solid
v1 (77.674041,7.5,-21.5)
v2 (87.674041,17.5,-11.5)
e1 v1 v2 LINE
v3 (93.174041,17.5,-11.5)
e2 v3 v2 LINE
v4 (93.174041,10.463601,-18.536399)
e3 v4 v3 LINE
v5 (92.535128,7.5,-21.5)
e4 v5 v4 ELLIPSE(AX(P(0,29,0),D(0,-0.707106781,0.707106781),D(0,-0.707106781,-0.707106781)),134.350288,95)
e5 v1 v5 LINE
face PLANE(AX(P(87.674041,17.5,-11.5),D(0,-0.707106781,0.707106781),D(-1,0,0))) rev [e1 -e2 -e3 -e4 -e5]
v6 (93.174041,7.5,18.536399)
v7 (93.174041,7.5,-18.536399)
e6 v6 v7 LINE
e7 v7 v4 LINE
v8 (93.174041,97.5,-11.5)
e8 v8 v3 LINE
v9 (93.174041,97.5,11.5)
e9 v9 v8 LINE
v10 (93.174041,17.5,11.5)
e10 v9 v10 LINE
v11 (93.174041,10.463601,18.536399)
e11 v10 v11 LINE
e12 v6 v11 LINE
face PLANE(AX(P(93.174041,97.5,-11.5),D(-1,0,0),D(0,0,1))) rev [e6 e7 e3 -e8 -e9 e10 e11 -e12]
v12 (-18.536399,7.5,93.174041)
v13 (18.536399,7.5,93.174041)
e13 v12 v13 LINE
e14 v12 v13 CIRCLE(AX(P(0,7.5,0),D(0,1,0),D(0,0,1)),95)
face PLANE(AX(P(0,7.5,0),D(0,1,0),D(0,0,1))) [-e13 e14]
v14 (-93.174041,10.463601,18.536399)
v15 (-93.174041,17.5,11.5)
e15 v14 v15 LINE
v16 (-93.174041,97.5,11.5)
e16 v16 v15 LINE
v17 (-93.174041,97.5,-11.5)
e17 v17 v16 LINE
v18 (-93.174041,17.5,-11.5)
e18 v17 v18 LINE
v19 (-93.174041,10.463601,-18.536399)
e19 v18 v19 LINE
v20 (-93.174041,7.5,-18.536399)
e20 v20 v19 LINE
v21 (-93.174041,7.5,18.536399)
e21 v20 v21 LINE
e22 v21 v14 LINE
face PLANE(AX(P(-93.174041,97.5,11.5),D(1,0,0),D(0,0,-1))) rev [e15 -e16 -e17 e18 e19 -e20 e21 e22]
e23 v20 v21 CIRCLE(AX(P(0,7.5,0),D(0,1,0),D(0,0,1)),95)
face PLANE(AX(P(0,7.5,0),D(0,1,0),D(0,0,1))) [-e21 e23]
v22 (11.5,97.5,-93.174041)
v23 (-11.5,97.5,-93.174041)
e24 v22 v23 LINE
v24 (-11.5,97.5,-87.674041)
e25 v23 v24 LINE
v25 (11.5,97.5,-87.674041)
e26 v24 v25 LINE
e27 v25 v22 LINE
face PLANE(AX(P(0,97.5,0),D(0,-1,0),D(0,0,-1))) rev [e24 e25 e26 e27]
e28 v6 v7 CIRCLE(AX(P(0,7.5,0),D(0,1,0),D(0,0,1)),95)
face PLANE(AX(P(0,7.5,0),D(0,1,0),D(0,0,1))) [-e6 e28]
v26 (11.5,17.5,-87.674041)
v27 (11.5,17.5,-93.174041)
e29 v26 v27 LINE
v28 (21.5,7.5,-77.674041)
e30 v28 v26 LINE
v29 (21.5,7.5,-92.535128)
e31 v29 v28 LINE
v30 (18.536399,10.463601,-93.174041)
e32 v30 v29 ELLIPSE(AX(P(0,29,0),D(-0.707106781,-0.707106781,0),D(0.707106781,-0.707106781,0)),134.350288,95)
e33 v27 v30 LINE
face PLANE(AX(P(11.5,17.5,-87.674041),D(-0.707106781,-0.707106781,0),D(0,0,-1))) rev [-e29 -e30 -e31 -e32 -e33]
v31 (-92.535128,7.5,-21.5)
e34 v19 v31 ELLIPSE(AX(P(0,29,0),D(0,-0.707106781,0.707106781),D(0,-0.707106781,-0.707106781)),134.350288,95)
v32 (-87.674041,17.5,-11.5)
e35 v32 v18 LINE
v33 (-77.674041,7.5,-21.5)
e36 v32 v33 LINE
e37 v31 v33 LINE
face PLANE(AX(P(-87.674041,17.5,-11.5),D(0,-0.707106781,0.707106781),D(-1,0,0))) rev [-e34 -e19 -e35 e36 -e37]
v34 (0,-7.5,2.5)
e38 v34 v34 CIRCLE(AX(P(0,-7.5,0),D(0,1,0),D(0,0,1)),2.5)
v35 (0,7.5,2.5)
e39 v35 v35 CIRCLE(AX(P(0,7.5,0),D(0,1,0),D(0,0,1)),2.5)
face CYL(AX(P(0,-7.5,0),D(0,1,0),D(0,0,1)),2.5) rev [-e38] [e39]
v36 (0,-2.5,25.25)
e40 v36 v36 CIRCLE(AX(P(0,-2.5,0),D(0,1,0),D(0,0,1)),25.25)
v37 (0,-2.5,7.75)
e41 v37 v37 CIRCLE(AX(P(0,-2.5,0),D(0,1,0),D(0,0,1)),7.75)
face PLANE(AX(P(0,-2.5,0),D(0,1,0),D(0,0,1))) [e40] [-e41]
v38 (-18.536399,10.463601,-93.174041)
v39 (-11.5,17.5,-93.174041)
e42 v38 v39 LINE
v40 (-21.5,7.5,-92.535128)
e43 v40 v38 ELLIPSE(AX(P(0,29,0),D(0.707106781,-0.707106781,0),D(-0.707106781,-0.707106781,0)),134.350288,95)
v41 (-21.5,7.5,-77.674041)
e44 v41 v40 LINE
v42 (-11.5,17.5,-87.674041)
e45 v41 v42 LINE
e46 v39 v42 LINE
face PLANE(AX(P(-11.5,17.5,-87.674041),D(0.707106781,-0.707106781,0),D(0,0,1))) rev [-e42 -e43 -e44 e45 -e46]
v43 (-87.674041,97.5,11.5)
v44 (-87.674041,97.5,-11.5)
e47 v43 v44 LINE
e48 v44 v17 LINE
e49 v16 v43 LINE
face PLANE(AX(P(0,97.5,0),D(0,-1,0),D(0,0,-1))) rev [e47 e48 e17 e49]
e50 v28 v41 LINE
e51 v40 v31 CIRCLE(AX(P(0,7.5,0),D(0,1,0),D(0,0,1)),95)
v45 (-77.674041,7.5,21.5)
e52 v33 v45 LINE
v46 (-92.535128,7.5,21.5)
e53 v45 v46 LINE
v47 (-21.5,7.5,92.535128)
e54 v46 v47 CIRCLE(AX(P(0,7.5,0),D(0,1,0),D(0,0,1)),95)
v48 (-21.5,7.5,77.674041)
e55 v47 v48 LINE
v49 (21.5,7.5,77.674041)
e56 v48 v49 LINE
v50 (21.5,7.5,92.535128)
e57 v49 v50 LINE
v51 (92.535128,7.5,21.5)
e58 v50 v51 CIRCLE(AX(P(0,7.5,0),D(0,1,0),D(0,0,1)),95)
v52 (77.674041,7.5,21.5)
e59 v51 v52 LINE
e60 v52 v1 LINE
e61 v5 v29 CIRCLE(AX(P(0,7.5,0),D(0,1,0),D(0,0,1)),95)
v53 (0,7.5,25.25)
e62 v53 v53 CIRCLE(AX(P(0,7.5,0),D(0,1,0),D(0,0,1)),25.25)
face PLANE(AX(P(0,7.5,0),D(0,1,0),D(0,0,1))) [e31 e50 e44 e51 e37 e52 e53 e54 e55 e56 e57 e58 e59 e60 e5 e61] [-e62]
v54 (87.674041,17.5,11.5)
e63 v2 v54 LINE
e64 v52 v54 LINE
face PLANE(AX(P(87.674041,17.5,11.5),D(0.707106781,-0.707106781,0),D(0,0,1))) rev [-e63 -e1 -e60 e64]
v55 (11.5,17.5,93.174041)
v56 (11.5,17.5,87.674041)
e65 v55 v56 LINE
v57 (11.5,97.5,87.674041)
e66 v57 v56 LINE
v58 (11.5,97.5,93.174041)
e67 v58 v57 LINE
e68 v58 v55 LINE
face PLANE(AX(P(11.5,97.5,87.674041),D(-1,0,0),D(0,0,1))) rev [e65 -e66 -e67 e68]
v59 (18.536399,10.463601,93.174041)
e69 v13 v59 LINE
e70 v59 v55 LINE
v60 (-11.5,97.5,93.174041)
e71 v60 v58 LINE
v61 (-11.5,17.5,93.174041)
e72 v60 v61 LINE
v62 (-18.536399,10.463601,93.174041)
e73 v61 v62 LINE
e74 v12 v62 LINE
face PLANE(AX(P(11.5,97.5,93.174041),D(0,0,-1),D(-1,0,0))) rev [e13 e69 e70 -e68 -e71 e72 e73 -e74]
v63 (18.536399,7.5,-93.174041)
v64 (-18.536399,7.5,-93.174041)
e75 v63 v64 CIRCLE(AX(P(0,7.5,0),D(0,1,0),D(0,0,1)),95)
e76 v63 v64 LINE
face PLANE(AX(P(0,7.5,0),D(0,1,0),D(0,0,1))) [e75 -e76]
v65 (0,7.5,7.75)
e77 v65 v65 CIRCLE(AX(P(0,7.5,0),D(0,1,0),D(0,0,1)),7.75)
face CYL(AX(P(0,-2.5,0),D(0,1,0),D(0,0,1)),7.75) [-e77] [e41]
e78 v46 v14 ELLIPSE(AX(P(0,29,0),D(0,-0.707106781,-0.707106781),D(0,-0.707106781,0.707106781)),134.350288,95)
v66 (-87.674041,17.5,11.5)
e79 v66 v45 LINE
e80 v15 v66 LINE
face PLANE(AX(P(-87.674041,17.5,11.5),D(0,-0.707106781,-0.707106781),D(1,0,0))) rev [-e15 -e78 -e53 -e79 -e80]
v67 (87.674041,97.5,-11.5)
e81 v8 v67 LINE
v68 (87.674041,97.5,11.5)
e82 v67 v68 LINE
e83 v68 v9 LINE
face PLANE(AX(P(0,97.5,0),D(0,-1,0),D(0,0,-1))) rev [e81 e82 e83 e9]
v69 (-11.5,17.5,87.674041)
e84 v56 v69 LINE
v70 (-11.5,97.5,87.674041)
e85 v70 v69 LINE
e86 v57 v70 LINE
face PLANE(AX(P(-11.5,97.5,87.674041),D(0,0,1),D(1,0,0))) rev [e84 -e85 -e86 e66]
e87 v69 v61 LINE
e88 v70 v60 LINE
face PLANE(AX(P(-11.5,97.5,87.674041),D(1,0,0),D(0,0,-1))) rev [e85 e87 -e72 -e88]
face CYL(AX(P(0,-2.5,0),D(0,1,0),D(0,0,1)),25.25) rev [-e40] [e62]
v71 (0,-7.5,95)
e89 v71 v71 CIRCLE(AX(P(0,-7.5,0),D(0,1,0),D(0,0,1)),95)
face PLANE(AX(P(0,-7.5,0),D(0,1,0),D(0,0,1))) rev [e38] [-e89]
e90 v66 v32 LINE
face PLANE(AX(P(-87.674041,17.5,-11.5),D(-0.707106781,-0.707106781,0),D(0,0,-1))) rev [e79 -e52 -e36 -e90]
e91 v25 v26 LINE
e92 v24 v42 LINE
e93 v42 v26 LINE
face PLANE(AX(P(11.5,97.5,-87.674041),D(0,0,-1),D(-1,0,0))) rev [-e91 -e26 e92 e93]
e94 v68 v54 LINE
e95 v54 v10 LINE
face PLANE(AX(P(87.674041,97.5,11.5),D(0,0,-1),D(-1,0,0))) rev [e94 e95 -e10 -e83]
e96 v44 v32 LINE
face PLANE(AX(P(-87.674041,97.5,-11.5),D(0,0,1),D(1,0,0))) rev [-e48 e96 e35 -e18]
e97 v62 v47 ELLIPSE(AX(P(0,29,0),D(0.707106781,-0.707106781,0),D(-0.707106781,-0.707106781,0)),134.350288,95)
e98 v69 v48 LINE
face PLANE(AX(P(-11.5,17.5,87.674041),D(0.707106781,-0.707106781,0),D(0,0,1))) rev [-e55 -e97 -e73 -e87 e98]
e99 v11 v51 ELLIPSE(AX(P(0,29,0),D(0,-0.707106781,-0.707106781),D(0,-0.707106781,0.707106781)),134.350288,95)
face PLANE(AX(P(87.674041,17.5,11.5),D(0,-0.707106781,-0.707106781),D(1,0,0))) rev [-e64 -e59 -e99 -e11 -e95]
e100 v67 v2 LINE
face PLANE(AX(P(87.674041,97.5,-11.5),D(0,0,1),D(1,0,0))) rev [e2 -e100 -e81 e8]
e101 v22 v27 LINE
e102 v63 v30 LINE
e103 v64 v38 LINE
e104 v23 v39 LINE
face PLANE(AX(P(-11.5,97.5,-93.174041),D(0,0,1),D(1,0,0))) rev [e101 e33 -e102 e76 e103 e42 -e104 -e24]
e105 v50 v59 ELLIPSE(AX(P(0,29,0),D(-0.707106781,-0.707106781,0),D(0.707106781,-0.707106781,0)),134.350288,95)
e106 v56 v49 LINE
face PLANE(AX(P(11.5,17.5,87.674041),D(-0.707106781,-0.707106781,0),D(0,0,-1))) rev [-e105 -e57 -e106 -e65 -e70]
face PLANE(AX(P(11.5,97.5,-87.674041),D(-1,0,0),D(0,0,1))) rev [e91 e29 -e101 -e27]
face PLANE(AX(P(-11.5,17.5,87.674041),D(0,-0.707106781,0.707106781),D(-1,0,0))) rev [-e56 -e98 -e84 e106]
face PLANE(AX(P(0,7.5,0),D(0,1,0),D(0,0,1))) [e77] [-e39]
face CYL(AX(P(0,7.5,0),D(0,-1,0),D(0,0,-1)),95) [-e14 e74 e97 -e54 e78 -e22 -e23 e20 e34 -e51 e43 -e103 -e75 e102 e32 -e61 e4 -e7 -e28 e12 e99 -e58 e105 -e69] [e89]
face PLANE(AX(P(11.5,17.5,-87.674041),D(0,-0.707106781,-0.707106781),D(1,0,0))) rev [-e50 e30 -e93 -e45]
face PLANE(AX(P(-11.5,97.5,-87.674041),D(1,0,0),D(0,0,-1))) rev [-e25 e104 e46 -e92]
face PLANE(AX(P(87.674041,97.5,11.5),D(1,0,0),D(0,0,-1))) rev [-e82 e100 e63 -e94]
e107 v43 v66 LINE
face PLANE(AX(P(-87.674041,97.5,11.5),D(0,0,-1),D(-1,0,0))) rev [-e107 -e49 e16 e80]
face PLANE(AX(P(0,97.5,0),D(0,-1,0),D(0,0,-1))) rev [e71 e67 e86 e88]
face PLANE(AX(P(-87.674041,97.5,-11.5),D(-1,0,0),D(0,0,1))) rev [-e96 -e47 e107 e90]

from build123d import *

# Parameters (mm, degrees)
BOSS_EXTRUDE1_DEPTH     = 7.5
SKETCH2_W               = 23
SKETCH2_H               = 5.500000000000014
SKETCH2_W_2             = 5.5
SKETCH2_H_2             = 23
BOSS_EXTRUDE2_DEPTH     = 90
SKETCH3_R               = 25.25
SKETCH3_R_2             = 7.75
CUT_EXTRUDE1_DEPTH      = 10
CUT_EXTRUDE2_DEPTH      = 162.70961628796235
CUT_EXTRUDE2_DEPTH_BACK = 162.70961628796235
SKETCH4_R               = 2.5
CHAMFER1_SIZE           = 10


with BuildPart() as part:
    # Sketch1 → Boss-Extrude1 (new, symmetric)
    with BuildSketch(Plane(origin=(0, 0, 0), x_dir=(1, 0, 0), z_dir=(0, 1, 0))):
        with BuildLine():
            ThreePointArc((-9.98613997947909, 94.47368421052632), (-82.27241335952168, 47.49999999999999), (-86.80968050516414, -38.58859119728691))
            ThreePointArc((-86.80968050516414, -38.58859119728691), (-82.27241335952166, -47.500000000000036), (-76.82354052568505, -55.885093013239505))
            ThreePointArc((-76.82354052568505, -55.885093013239505), (4.801e-14, -95.00000000000001), (76.82354052568508, -55.88509301323945))
            ThreePointArc((76.82354052568508, -55.88509301323945), (82.2724133595217, -47.499999999999986), (86.80968050516417, -38.58859119728684))
            ThreePointArc((86.80968050516417, -38.58859119728684), (82.27241335952168, 47.50000000000001), (9.986139979479082, 94.47368421052632))
            ThreePointArc((9.986139979479082, 94.47368421052632), (5.82e-15, 95), (-9.98613997947909, 94.47368421052632))
        make_face()
    extrude(amount=BOSS_EXTRUDE1_DEPTH, both=True)

    # Sketch2 → Boss-Extrude2 (add)
    with BuildSketch(Plane(origin=(0, 7.5, 0), x_dir=(1, 0, 0), z_dir=(0, 1, 0))):
        with Locations((0, 90.42404100918682)):
            Rectangle(SKETCH2_W, SKETCH2_H)
        with Locations((90.42404100918962, 2.14584e-12)):
            Rectangle(SKETCH2_W_2, SKETCH2_H_2)
        Polygon((11.50000000000496, -93.17404100918749), (-11.49999999999504, -93.17404100918749), (-11.499999999995042, -87.67404100918748), (11.500000000004958, -87.67404100918748), align=None)
        Polygon((-93.17404100918469, -11.500000000002824), (-93.17404100918469, 11.499999999997176), (-87.67404100918468, 11.499999999997177), (-87.67404100918468, -11.500000000002823), align=None)
    extrude(amount=BOSS_EXTRUDE2_DEPTH)

    # Sketch3 → Cut-Extrude1 (cut)
    with BuildSketch(Plane(origin=(0, 7.5, 0), x_dir=(1, 0, 0), z_dir=(0, 1, 0))):
        with Locations(Location((0, 0, 0), (0, 0, 270))):
            Circle(SKETCH3_R)
        with Locations(Location((0, 0, 0), (0, 0, 270))):
            Circle(SKETCH3_R_2, mode=Mode.SUBTRACT)
    extrude(amount=-CUT_EXTRUDE1_DEPTH, mode=Mode.SUBTRACT)

    # Sketch4 → Cut-Extrude2 (cut, two sides: drawn at the far end of the back side and taken through both)
    with BuildSketch(Plane(origin=(0, 7.5, 0), x_dir=(1, 0, 0), z_dir=(0, 1, 0)).offset(-CUT_EXTRUDE2_DEPTH_BACK)):
        with Locations(Location((0, 0, 0), (0, 0, 270))):
            Circle(SKETCH4_R)
    extrude(amount=CUT_EXTRUDE2_DEPTH + CUT_EXTRUDE2_DEPTH_BACK, mode=Mode.SUBTRACT)

    # Chamfer1
    # the kernel refuses this chamfer: 10 mm, written as the material it adds along each edge
    with BuildSketch(Plane(origin=(-11.5, 7.5, -87.67404100918681), x_dir=(-0.9996219169112968, -0.027495876610586403, 0), z_dir=(0, 0, -1))) as chamfer1_piece_1_section:
        Polygon((CHAMFER1_SIZE * 0.999621916911, CHAMFER1_SIZE * 0.0274958766106), (-CHAMFER1_SIZE * 0.0274958766106, CHAMFER1_SIZE * 0.999621916911), (0, 0), align=None)
    chamfer1_piece_1 = extrude(amount=5.500000000000014, mode=Mode.PRIVATE)
    chamfer1_piece_1 = chamfer1_piece_1 & Plane(origin=(-7.11e-15, 10.81050074609558, 2.265e-14), x_dir=(-0.10511726294188506, 0, -0.9944598337950139), z_dir=(0, -1, 0)) * Cylinder(95, 51, mode=Mode.PRIVATE)
    add(chamfer1_piece_1)
    with BuildSketch(Plane(origin=(11.5, 7.5, -87.67404100918681), x_dir=(0, -0.027495876610586403, 0.9996219169112968), z_dir=(-1, 0, 0)), Plane(origin=(87.67404100918962, 7.5, 11.499999999997854), x_dir=(-0.9996219169112968, -0.027495876610586403, 0), z_dir=(0, 0, -1)), Plane(origin=(-11.499999999995042, 7.5, 87.67404100918748), x_dir=(0, -0.027495876610586403, -0.9996219169112968), z_dir=(1, 0, 0)), Plane(origin=(-87.67404100918468, 7.5, -11.499999999997177), x_dir=(0.9996219169112968, -0.027495876610586403, 0), z_dir=(0, 0, 1))) as chamfer1_piece_2:
        Polygon((CHAMFER1_SIZE * 0.999621916911, CHAMFER1_SIZE * 0.0274958766106), (-CHAMFER1_SIZE * 0.0274958766106, CHAMFER1_SIZE * 0.999621916911), (0, 0), align=None)
    extrude(amount=23)
    with BuildSketch(Plane(origin=(11.5, 7.5, -93.17404100918682), x_dir=(0.9996219169112968, -0.027495876610586403, 0), z_dir=(0, 0, 1))) as chamfer1_piece_3_section:
        Polygon((CHAMFER1_SIZE * 0.999621916911, CHAMFER1_SIZE * 0.0274958766106), (-CHAMFER1_SIZE * 0.0274958766106, CHAMFER1_SIZE * 0.999621916911), (0, 0), align=None)
    chamfer1_piece_3 = extrude(amount=5.500000000000014, mode=Mode.PRIVATE)
    chamfer1_piece_3 = chamfer1_piece_3 & Plane(origin=(-7.11e-15, 10.810500746107277, 1.066e-14), x_dir=(0.9137861105806754, 0, 0.4061956968135455), z_dir=(0, -1, 0)) * Cylinder(95.00000000000001, 51, mode=Mode.PRIVATE)
    add(chamfer1_piece_3)
    with BuildSketch(Plane(origin=(87.67404100918962, 7.5, -11.500000000002146), x_dir=(0, -0.027495876610586403, -0.9996219169112968), z_dir=(1, 0, 0))) as chamfer1_piece_4_section:
        Polygon((CHAMFER1_SIZE * 0.999621916911, CHAMFER1_SIZE * 0.0274958766106), (-CHAMFER1_SIZE * 0.0274958766106, CHAMFER1_SIZE * 0.999621916911), (0, 0), align=None)
    chamfer1_piece_4 = extrude(amount=5.500000000000014, mode=Mode.PRIVATE)
    chamfer1_piece_4 = chamfer1_piece_4 & Plane(origin=(-7.11e-15, 10.81050074609573, 1.066e-14), x_dir=(0.9137861105806754, 0, 0.4061956968135455), z_dir=(0, -1, 0)) * Cylinder(95.00000000000001, 51, mode=Mode.PRIVATE)
    add(chamfer1_piece_4)
    with BuildSketch(Plane(origin=(93.17404100918964, 7.5, 11.499999999997854), x_dir=(0, -0.027495876610586403, 0.9996219169112968), z_dir=(-1, 0, 0))) as chamfer1_piece_5_section:
        Polygon((CHAMFER1_SIZE * 0.999621916911, CHAMFER1_SIZE * 0.0274958766106), (-CHAMFER1_SIZE * 0.0274958766106, CHAMFER1_SIZE * 0.999621916911), (0, 0), align=None)
    chamfer1_piece_5 = extrude(amount=5.500000000000014, mode=Mode.PRIVATE)
    chamfer1_piece_5 = chamfer1_piece_5 & Plane(origin=(-7.11e-15, 10.81050074610739, 1.066e-14), x_dir=(0.9137861105806754, 0, 0.4061956968135455), z_dir=(0, -1, 0)) * Cylinder(95.00000000000001, 51, mode=Mode.PRIVATE)
    add(chamfer1_piece_5)
    with BuildSketch(Plane(origin=(11.500000000004958, 7.5, 87.67404100918748), x_dir=(0.9996219169112968, -0.0274958766105864, 0), z_dir=(3.2e-16, 0, 1))) as chamfer1_piece_6_section:
        Polygon((CHAMFER1_SIZE * 0.999621916911, CHAMFER1_SIZE * 0.0274958766106), (-CHAMFER1_SIZE * 0.0274958766106, CHAMFER1_SIZE * 0.999621916911), (0, 0), align=None)
    chamfer1_piece_6 = extrude(amount=5.500000000000014, mode=Mode.PRIVATE)
    chamfer1_piece_6 = chamfer1_piece_6 & Plane(origin=(-7.11e-15, 10.810500746095684, 4.263e-14), x_dir=(-0.8086688476387901, 0, 0.5882641369814681), z_dir=(0, -1, 0)) * Cylinder(94.99999999999999, 51, mode=Mode.PRIVATE)
    add(chamfer1_piece_6)
    with BuildSketch(Plane(origin=(-11.49999999999504, 7.5, 93.17404100918749), x_dir=(-0.9996219169112968, -0.027495876610586403, 0), z_dir=(-3.2e-16, 0, -1))) as chamfer1_piece_7_section:
        Polygon((CHAMFER1_SIZE * 0.999621916911, CHAMFER1_SIZE * 0.0274958766106), (-CHAMFER1_SIZE * 0.0274958766106, CHAMFER1_SIZE * 0.999621916911), (0, 0), align=None)
    chamfer1_piece_7 = extrude(amount=5.500000000000014, mode=Mode.PRIVATE)
    chamfer1_piece_7 = chamfer1_piece_7 & Plane(origin=(-7.11e-15, 10.810500746107264, 4.263e-14), x_dir=(-0.8086688476387901, 0, 0.5882641369814681), z_dir=(0, -1, 0)) * Cylinder(94.99999999999999, 51, mode=Mode.PRIVATE)
    add(chamfer1_piece_7)
    with BuildSketch(Plane(origin=(-87.67404100918468, 7.5, 11.500000000002823), x_dir=(0, -0.02749587661058641, 0.9996219169112968), z_dir=(-1, 0, 3.2e-16))) as chamfer1_piece_8_section:
        Polygon((CHAMFER1_SIZE * 0.999621916911, CHAMFER1_SIZE * 0.0274958766106), (-CHAMFER1_SIZE * 0.0274958766106, CHAMFER1_SIZE * 0.999621916911), (0, 0), align=None)
    chamfer1_piece_8 = extrude(amount=5.500000000000014, mode=Mode.PRIVATE)
    chamfer1_piece_8 = chamfer1_piece_8 & Plane(origin=(-7.11e-15, 10.8105007460955, 2.265e-14), x_dir=(-0.10511726294188506, 0, -0.9944598337950139), z_dir=(0, -1, 0)) * Cylinder(95, 51, mode=Mode.PRIVATE)
    add(chamfer1_piece_8)
    with BuildSketch(Plane(origin=(-93.17404100918469, 7.5, -11.499999999997176), x_dir=(0, -0.027495876610586403, -0.9996219169112968), z_dir=(1, 0, -3.2e-16))) as chamfer1_piece_9_section:
        Polygon((CHAMFER1_SIZE * 0.999621916911, CHAMFER1_SIZE * 0.0274958766106), (-CHAMFER1_SIZE * 0.0274958766106, CHAMFER1_SIZE * 0.999621916911), (0, 0), align=None)
    chamfer1_piece_9 = extrude(amount=5.500000000000014, mode=Mode.PRIVATE)
    chamfer1_piece_9 = chamfer1_piece_9 & Plane(origin=(-7.11e-15, 10.810500746107152, 2.265e-14), x_dir=(-0.10511726294188506, 0, -0.9944598337950139), z_dir=(0, -1, 0)) * Cylinder(95, 51, mode=Mode.PRIVATE)
    add(chamfer1_piece_9)
    with BuildSketch(Plane(origin=(-11.5, 7.5, -61.9572111295277), x_dir=(-0.9996219169112968, -0.027495876610586403, 0), z_dir=(0, 0, -1))) as chamfer1_piece_10a_section:
        Polygon((CHAMFER1_SIZE * 0.999621916911, CHAMFER1_SIZE * 0.0274958766106), (-CHAMFER1_SIZE * 0.0274958766106, CHAMFER1_SIZE * 0.999621916911), (0, 0), align=None)
    chamfer1_piece_10a = extrude(amount=31.216829879659123, mode=Mode.PRIVATE)
    chamfer1_piece_10a = split(chamfer1_piece_10a, bisect_by=Plane(origin=(-14.797936268059384, 10.797936268059397, -87.67404100918681), z_dir=(0, 0, 1)), keep=Keep.TOP, mode=Mode.PRIVATE)
    with BuildSketch(Plane(origin=(11.5, 7.5, -87.67404100918681), x_dir=(0, -0.027495876610586403, 0.9996219169112968), z_dir=(-1, 0, 0))) as chamfer1_piece_10b_section:
        Polygon((CHAMFER1_SIZE * 0.999621916911, CHAMFER1_SIZE * 0.0274958766106), (-CHAMFER1_SIZE * 0.0274958766106, CHAMFER1_SIZE * 0.999621916911), (0, 0), align=None)
    chamfer1_piece_10b = extrude(amount=48.7168298796591, mode=Mode.PRIVATE)
    chamfer1_piece_10b = chamfer1_piece_10b & Plane(origin=(-7.11e-15, 10.791626424571733, 1.066e-14), x_dir=(0.9137861105806754, 0, 0.4061956968135455), z_dir=(0, -1, 0)) * Cylinder(95.00000000000001, 138, mode=Mode.PRIVATE)
    chamfer1_piece_10b = split(chamfer1_piece_10b, bisect_by=Plane(origin=(-11.5, 10.791626424571733, -84.36813075127401), z_dir=(-1, 0, 0)), keep=Keep.TOP, mode=Mode.PRIVATE)
    chamfer1_piece_10 = chamfer1_piece_10a & chamfer1_piece_10b
    add(chamfer1_piece_10)
    with BuildSketch(Plane(origin=(37.2168298796591, 7.5, -87.67404100918681), x_dir=(0, -0.027495876610586403, 0.9996219169112968), z_dir=(-1, 0, 0))) as chamfer1_piece_11a_section:
        Polygon((CHAMFER1_SIZE * 0.999621916911, CHAMFER1_SIZE * 0.0274958766106), (-CHAMFER1_SIZE * 0.0274958766106, CHAMFER1_SIZE * 0.999621916911), (0, 0), align=None)
    chamfer1_piece_11a = extrude(amount=48.7168298796591, mode=Mode.PRIVATE)
    chamfer1_piece_11a = chamfer1_piece_11a & Plane(origin=(-7.11e-15, 10.791626424554309, 1.066e-14), x_dir=(0.9137861105806754, 0, 0.4061956968135455), z_dir=(0, -1, 0)) * Cylinder(95.00000000000001, 138, mode=Mode.PRIVATE)
    chamfer1_piece_11a = split(chamfer1_piece_11a, bisect_by=Plane(origin=(11.5, 10.791626424554309, -84.36813075125882), z_dir=(1, 0, 0)), keep=Keep.TOP, mode=Mode.PRIVATE)
    with BuildSketch(Plane(origin=(11.5, 7.5, -93.17404100918682), x_dir=(0.9996219169112968, -0.027495876610586403, 0), z_dir=(0, 0, 1))) as chamfer1_piece_11b_section:
        Polygon((CHAMFER1_SIZE * 0.999621916911, CHAMFER1_SIZE * 0.0274958766106), (-CHAMFER1_SIZE * 0.0274958766106, CHAMFER1_SIZE * 0.999621916911), (0, 0), align=None)
    chamfer1_piece_11b = extrude(amount=31.216829879659123, mode=Mode.PRIVATE)
    chamfer1_piece_11b = split(chamfer1_piece_11b, bisect_by=Plane(origin=(14.797936268059384, 10.797936268059397, -87.67404100918681), z_dir=(0, 0, 1)), keep=Keep.TOP, mode=Mode.PRIVATE)
    chamfer1_piece_11 = chamfer1_piece_11a & chamfer1_piece_11b
    add(chamfer1_piece_11)
    with BuildSketch(Plane(origin=(61.95721112953051, 7.5, -11.500000000002146), x_dir=(0, -0.027495876610586403, -0.9996219169112968), z_dir=(1, 0, 0))) as chamfer1_piece_12a_section:
        Polygon((CHAMFER1_SIZE * 0.999621916911, CHAMFER1_SIZE * 0.0274958766106), (-CHAMFER1_SIZE * 0.0274958766106, CHAMFER1_SIZE * 0.999621916911), (0, 0), align=None)
    chamfer1_piece_12a = extrude(amount=31.216829879659123, mode=Mode.PRIVATE)
    chamfer1_piece_12a = split(chamfer1_piece_12a, bisect_by=Plane(origin=(87.67404100918962, 10.797936268059399, -14.797936268061527), z_dir=(-1, 0, 0)), keep=Keep.TOP, mode=Mode.PRIVATE)
    with BuildSketch(Plane(origin=(87.67404100918962, 7.5, 11.499999999997854), x_dir=(-0.9996219169112968, -0.027495876610586403, 0), z_dir=(0, 0, -1))) as chamfer1_piece_12b_section:
        Polygon((CHAMFER1_SIZE * 0.999621916911, CHAMFER1_SIZE * 0.0274958766106), (-CHAMFER1_SIZE * 0.0274958766106, CHAMFER1_SIZE * 0.999621916911), (0, 0), align=None)
    chamfer1_piece_12b = extrude(amount=48.7168298796591, mode=Mode.PRIVATE)
    chamfer1_piece_12b = chamfer1_piece_12b & Plane(origin=(-7.11e-15, 10.791626424571684, 1.066e-14), x_dir=(0.9137861105806754, 0, 0.4061956968135455), z_dir=(0, -1, 0)) * Cylinder(95.00000000000001, 138, mode=Mode.PRIVATE)
    chamfer1_piece_12b = split(chamfer1_piece_12b, bisect_by=Plane(origin=(84.36813075127668, 10.791626424571684, -11.500000000002146), z_dir=(0, 0, -1)), keep=Keep.TOP, mode=Mode.PRIVATE)
    chamfer1_piece_12 = chamfer1_piece_12a & chamfer1_piece_12b
    add(chamfer1_piece_12)
    with BuildSketch(Plane(origin=(87.67404100918962, 7.5, 37.216829879656956), x_dir=(-0.9996219169112968, -0.027495876610586403, 0), z_dir=(0, 0, -1))) as chamfer1_piece_13a_section:
        Polygon((CHAMFER1_SIZE * 0.999621916911, CHAMFER1_SIZE * 0.0274958766106), (-CHAMFER1_SIZE * 0.0274958766106, CHAMFER1_SIZE * 0.999621916911), (0, 0), align=None)
    chamfer1_piece_13a = extrude(amount=48.7168298796591, mode=Mode.PRIVATE)
    chamfer1_piece_13a = chamfer1_piece_13a & Plane(origin=(-7.11e-15, 10.791626424553938, 1.066e-14), x_dir=(0.9137861105806754, 0, 0.4061956968135455), z_dir=(0, -1, 0)) * Cylinder(95.00000000000001, 138, mode=Mode.PRIVATE)
    chamfer1_piece_13a = split(chamfer1_piece_13a, bisect_by=Plane(origin=(84.36813075126396, 10.791626424553938, 11.499999999997854), z_dir=(0, 0, 1)), keep=Keep.TOP, mode=Mode.PRIVATE)
    with BuildSketch(Plane(origin=(93.17404100918964, 7.5, 11.499999999997854), x_dir=(0, -0.027495876610586403, 0.9996219169112968), z_dir=(-1, 0, 0))) as chamfer1_piece_13b_section:
        Polygon((CHAMFER1_SIZE * 0.999621916911, CHAMFER1_SIZE * 0.0274958766106), (-CHAMFER1_SIZE * 0.0274958766106, CHAMFER1_SIZE * 0.999621916911), (0, 0), align=None)
    chamfer1_piece_13b = extrude(amount=31.216829879659123, mode=Mode.PRIVATE)
    chamfer1_piece_13b = split(chamfer1_piece_13b, bisect_by=Plane(origin=(87.67404100918962, 10.797936268059402, 14.79793626805724), z_dir=(-1, 0, 0)), keep=Keep.TOP, mode=Mode.PRIVATE)
    chamfer1_piece_13 = chamfer1_piece_13a & chamfer1_piece_13b
    add(chamfer1_piece_13)
    with BuildSketch(Plane(origin=(11.500000000004949, 7.5, 61.95721112952837), x_dir=(0.9996219169112968, -0.027495876610586403, 0), z_dir=(3.2e-16, 0, 1))) as chamfer1_piece_14a_section:
        Polygon((CHAMFER1_SIZE * 0.999621916911, CHAMFER1_SIZE * 0.0274958766106), (-CHAMFER1_SIZE * 0.0274958766106, CHAMFER1_SIZE * 0.999621916911), (0, 0), align=None)
    chamfer1_piece_14a = extrude(amount=31.216829879659123, mode=Mode.PRIVATE)
    chamfer1_piece_14a = split(chamfer1_piece_14a, bisect_by=Plane(origin=(14.797936268064339, 10.797936268059399, 87.67404100918748), z_dir=(0, 0, -1)), keep=Keep.TOP, mode=Mode.PRIVATE)
    with BuildSketch(Plane(origin=(-11.499999999995042, 7.5, 87.67404100918748), x_dir=(0, -0.027495876610586403, -0.9996219169112968), z_dir=(1, 0, 0))) as chamfer1_piece_14b_section:
        Polygon((CHAMFER1_SIZE * 0.999621916911, CHAMFER1_SIZE * 0.0274958766106), (-CHAMFER1_SIZE * 0.0274958766106, CHAMFER1_SIZE * 0.999621916911), (0, 0), align=None)
    chamfer1_piece_14b = extrude(amount=48.7168298796591, mode=Mode.PRIVATE)
    chamfer1_piece_14b = chamfer1_piece_14b & Plane(origin=(-7.11e-15, 10.791626424571755, 4.263e-14), x_dir=(-0.8086688476387901, 0, 0.5882641369814681), z_dir=(0, -1, 0)) * Cylinder(94.99999999999999, 138, mode=Mode.PRIVATE)
    chamfer1_piece_14b = split(chamfer1_piece_14b, bisect_by=Plane(origin=(11.500000000004956, 10.791626424571755, 84.3681307512747), z_dir=(1, 0, -3.2e-16)), keep=Keep.TOP, mode=Mode.PRIVATE)
    chamfer1_piece_14 = chamfer1_piece_14a & chamfer1_piece_14b
    add(chamfer1_piece_14)
    with BuildSketch(Plane(origin=(-37.21682987965415, 7.5, 87.67404100918748), x_dir=(0, -0.027495876610586403, -0.9996219169112968), z_dir=(1, 0, 0))) as chamfer1_piece_15a_section:
        Polygon((CHAMFER1_SIZE * 0.999621916911, CHAMFER1_SIZE * 0.0274958766106), (-CHAMFER1_SIZE * 0.0274958766106, CHAMFER1_SIZE * 0.999621916911), (0, 0), align=None)
    chamfer1_piece_15a = extrude(amount=48.71682987965911, mode=Mode.PRIVATE)
    chamfer1_piece_15a = chamfer1_piece_15a & Plane(origin=(-7.11e-15, 10.791626424554186, 4.263e-14), x_dir=(-0.8086688476387901, 0, 0.5882641369814681), z_dir=(0, -1, 0)) * Cylinder(94.99999999999999, 138, mode=Mode.PRIVATE)
    chamfer1_piece_15a = split(chamfer1_piece_15a, bisect_by=Plane(origin=(-11.499999999995044, 10.791626424554186, 84.36813075126142), z_dir=(-1, 0, 3.2e-16)), keep=Keep.TOP, mode=Mode.PRIVATE)
    with BuildSketch(Plane(origin=(-11.49999999999504, 7.5, 93.17404100918749), x_dir=(-0.9996219169112968, -0.027495876610586403, 0), z_dir=(-3.2e-16, 0, -1))) as chamfer1_piece_15b_section:
        Polygon((CHAMFER1_SIZE * 0.999621916911, CHAMFER1_SIZE * 0.0274958766106), (-CHAMFER1_SIZE * 0.0274958766106, CHAMFER1_SIZE * 0.999621916911), (0, 0), align=None)
    chamfer1_piece_15b = extrude(amount=31.216829879659123, mode=Mode.PRIVATE)
    chamfer1_piece_15b = split(chamfer1_piece_15b, bisect_by=Plane(origin=(-14.797936268054428, 10.797936268059393, 87.67404100918748), z_dir=(0, 0, -1)), keep=Keep.TOP, mode=Mode.PRIVATE)
    chamfer1_piece_15 = chamfer1_piece_15a & chamfer1_piece_15b
    add(chamfer1_piece_15)
    with BuildSketch(Plane(origin=(-61.95721112952557, 7.5, 11.500000000002814), x_dir=(0, -0.027495876610586403, 0.9996219169112968), z_dir=(-1, 0, 3.2e-16))) as chamfer1_piece_16a_section:
        Polygon((CHAMFER1_SIZE * 0.999621916911, CHAMFER1_SIZE * 0.0274958766106), (-CHAMFER1_SIZE * 0.0274958766106, CHAMFER1_SIZE * 0.999621916911), (0, 0), align=None)
    chamfer1_piece_16a = extrude(amount=31.216829879659123, mode=Mode.PRIVATE)
    chamfer1_piece_16a = split(chamfer1_piece_16a, bisect_by=Plane(origin=(-87.67404100918468, 10.7979362680594, 14.797936268062196), z_dir=(1, 0, 0)), keep=Keep.TOP, mode=Mode.PRIVATE)
    with BuildSketch(Plane(origin=(-87.67404100918468, 7.5, -11.499999999997177), x_dir=(0.9996219169112968, -0.027495876610586403, 0), z_dir=(0, 0, 1))) as chamfer1_piece_16b_section:
        Polygon((CHAMFER1_SIZE * 0.999621916911, CHAMFER1_SIZE * 0.0274958766106), (-CHAMFER1_SIZE * 0.0274958766106, CHAMFER1_SIZE * 0.999621916911), (0, 0), align=None)
    chamfer1_piece_16b = extrude(amount=48.7168298796591, mode=Mode.PRIVATE)
    chamfer1_piece_16b = chamfer1_piece_16b & Plane(origin=(-7.11e-15, 10.791626424571803, 2.265e-14), x_dir=(-0.10511726294188506, 0, -0.9944598337950139), z_dir=(0, -1, 0)) * Cylinder(95, 138, mode=Mode.PRIVATE)
    chamfer1_piece_16b = split(chamfer1_piece_16b, bisect_by=Plane(origin=(-84.36813075127199, 10.791626424571803, 11.50000000000282), z_dir=(3.2e-16, 0, 1)), keep=Keep.TOP, mode=Mode.PRIVATE)
    chamfer1_piece_16 = chamfer1_piece_16a & chamfer1_piece_16b
    add(chamfer1_piece_16)
    with BuildSketch(Plane(origin=(-87.67404100918468, 7.5, -37.21682987965628), x_dir=(0.9996219169112968, -0.027495876610586403, 0), z_dir=(0, 0, 1))) as chamfer1_piece_17a_section:
        Polygon((CHAMFER1_SIZE * 0.999621916911, CHAMFER1_SIZE * 0.0274958766106), (-CHAMFER1_SIZE * 0.0274958766106, CHAMFER1_SIZE * 0.999621916911), (0, 0), align=None)
    chamfer1_piece_17a = extrude(amount=48.7168298796591, mode=Mode.PRIVATE)
    chamfer1_piece_17a = chamfer1_piece_17a & Plane(origin=(-7.11e-15, 10.791626424554211, 2.265e-14), x_dir=(-0.10511726294188506, 0, -0.9944598337950139), z_dir=(0, -1, 0)) * Cylinder(95, 138, mode=Mode.PRIVATE)
    chamfer1_piece_17a = split(chamfer1_piece_17a, bisect_by=Plane(origin=(-84.36813075125824, 10.791626424554211, -11.49999999999718), z_dir=(-3.2e-16, 0, -1)), keep=Keep.TOP, mode=Mode.PRIVATE)
    with BuildSketch(Plane(origin=(-93.17404100918469, 7.5, -11.499999999997176), x_dir=(0, -0.027495876610586403, -0.9996219169112968), z_dir=(1, 0, -3.2e-16))) as chamfer1_piece_17b_section:
        Polygon((CHAMFER1_SIZE * 0.999621916911, CHAMFER1_SIZE * 0.0274958766106), (-CHAMFER1_SIZE * 0.0274958766106, CHAMFER1_SIZE * 0.999621916911), (0, 0), align=None)
    chamfer1_piece_17b = extrude(amount=31.216829879659123, mode=Mode.PRIVATE)
    chamfer1_piece_17b = split(chamfer1_piece_17b, bisect_by=Plane(origin=(-87.67404100918468, 10.797936268059397, -14.79793626805656), z_dir=(1, 0, 0)), keep=Keep.TOP, mode=Mode.PRIVATE)
    chamfer1_piece_17 = chamfer1_piece_17a & chamfer1_piece_17b
    add(chamfer1_piece_17)


solid = part.part
